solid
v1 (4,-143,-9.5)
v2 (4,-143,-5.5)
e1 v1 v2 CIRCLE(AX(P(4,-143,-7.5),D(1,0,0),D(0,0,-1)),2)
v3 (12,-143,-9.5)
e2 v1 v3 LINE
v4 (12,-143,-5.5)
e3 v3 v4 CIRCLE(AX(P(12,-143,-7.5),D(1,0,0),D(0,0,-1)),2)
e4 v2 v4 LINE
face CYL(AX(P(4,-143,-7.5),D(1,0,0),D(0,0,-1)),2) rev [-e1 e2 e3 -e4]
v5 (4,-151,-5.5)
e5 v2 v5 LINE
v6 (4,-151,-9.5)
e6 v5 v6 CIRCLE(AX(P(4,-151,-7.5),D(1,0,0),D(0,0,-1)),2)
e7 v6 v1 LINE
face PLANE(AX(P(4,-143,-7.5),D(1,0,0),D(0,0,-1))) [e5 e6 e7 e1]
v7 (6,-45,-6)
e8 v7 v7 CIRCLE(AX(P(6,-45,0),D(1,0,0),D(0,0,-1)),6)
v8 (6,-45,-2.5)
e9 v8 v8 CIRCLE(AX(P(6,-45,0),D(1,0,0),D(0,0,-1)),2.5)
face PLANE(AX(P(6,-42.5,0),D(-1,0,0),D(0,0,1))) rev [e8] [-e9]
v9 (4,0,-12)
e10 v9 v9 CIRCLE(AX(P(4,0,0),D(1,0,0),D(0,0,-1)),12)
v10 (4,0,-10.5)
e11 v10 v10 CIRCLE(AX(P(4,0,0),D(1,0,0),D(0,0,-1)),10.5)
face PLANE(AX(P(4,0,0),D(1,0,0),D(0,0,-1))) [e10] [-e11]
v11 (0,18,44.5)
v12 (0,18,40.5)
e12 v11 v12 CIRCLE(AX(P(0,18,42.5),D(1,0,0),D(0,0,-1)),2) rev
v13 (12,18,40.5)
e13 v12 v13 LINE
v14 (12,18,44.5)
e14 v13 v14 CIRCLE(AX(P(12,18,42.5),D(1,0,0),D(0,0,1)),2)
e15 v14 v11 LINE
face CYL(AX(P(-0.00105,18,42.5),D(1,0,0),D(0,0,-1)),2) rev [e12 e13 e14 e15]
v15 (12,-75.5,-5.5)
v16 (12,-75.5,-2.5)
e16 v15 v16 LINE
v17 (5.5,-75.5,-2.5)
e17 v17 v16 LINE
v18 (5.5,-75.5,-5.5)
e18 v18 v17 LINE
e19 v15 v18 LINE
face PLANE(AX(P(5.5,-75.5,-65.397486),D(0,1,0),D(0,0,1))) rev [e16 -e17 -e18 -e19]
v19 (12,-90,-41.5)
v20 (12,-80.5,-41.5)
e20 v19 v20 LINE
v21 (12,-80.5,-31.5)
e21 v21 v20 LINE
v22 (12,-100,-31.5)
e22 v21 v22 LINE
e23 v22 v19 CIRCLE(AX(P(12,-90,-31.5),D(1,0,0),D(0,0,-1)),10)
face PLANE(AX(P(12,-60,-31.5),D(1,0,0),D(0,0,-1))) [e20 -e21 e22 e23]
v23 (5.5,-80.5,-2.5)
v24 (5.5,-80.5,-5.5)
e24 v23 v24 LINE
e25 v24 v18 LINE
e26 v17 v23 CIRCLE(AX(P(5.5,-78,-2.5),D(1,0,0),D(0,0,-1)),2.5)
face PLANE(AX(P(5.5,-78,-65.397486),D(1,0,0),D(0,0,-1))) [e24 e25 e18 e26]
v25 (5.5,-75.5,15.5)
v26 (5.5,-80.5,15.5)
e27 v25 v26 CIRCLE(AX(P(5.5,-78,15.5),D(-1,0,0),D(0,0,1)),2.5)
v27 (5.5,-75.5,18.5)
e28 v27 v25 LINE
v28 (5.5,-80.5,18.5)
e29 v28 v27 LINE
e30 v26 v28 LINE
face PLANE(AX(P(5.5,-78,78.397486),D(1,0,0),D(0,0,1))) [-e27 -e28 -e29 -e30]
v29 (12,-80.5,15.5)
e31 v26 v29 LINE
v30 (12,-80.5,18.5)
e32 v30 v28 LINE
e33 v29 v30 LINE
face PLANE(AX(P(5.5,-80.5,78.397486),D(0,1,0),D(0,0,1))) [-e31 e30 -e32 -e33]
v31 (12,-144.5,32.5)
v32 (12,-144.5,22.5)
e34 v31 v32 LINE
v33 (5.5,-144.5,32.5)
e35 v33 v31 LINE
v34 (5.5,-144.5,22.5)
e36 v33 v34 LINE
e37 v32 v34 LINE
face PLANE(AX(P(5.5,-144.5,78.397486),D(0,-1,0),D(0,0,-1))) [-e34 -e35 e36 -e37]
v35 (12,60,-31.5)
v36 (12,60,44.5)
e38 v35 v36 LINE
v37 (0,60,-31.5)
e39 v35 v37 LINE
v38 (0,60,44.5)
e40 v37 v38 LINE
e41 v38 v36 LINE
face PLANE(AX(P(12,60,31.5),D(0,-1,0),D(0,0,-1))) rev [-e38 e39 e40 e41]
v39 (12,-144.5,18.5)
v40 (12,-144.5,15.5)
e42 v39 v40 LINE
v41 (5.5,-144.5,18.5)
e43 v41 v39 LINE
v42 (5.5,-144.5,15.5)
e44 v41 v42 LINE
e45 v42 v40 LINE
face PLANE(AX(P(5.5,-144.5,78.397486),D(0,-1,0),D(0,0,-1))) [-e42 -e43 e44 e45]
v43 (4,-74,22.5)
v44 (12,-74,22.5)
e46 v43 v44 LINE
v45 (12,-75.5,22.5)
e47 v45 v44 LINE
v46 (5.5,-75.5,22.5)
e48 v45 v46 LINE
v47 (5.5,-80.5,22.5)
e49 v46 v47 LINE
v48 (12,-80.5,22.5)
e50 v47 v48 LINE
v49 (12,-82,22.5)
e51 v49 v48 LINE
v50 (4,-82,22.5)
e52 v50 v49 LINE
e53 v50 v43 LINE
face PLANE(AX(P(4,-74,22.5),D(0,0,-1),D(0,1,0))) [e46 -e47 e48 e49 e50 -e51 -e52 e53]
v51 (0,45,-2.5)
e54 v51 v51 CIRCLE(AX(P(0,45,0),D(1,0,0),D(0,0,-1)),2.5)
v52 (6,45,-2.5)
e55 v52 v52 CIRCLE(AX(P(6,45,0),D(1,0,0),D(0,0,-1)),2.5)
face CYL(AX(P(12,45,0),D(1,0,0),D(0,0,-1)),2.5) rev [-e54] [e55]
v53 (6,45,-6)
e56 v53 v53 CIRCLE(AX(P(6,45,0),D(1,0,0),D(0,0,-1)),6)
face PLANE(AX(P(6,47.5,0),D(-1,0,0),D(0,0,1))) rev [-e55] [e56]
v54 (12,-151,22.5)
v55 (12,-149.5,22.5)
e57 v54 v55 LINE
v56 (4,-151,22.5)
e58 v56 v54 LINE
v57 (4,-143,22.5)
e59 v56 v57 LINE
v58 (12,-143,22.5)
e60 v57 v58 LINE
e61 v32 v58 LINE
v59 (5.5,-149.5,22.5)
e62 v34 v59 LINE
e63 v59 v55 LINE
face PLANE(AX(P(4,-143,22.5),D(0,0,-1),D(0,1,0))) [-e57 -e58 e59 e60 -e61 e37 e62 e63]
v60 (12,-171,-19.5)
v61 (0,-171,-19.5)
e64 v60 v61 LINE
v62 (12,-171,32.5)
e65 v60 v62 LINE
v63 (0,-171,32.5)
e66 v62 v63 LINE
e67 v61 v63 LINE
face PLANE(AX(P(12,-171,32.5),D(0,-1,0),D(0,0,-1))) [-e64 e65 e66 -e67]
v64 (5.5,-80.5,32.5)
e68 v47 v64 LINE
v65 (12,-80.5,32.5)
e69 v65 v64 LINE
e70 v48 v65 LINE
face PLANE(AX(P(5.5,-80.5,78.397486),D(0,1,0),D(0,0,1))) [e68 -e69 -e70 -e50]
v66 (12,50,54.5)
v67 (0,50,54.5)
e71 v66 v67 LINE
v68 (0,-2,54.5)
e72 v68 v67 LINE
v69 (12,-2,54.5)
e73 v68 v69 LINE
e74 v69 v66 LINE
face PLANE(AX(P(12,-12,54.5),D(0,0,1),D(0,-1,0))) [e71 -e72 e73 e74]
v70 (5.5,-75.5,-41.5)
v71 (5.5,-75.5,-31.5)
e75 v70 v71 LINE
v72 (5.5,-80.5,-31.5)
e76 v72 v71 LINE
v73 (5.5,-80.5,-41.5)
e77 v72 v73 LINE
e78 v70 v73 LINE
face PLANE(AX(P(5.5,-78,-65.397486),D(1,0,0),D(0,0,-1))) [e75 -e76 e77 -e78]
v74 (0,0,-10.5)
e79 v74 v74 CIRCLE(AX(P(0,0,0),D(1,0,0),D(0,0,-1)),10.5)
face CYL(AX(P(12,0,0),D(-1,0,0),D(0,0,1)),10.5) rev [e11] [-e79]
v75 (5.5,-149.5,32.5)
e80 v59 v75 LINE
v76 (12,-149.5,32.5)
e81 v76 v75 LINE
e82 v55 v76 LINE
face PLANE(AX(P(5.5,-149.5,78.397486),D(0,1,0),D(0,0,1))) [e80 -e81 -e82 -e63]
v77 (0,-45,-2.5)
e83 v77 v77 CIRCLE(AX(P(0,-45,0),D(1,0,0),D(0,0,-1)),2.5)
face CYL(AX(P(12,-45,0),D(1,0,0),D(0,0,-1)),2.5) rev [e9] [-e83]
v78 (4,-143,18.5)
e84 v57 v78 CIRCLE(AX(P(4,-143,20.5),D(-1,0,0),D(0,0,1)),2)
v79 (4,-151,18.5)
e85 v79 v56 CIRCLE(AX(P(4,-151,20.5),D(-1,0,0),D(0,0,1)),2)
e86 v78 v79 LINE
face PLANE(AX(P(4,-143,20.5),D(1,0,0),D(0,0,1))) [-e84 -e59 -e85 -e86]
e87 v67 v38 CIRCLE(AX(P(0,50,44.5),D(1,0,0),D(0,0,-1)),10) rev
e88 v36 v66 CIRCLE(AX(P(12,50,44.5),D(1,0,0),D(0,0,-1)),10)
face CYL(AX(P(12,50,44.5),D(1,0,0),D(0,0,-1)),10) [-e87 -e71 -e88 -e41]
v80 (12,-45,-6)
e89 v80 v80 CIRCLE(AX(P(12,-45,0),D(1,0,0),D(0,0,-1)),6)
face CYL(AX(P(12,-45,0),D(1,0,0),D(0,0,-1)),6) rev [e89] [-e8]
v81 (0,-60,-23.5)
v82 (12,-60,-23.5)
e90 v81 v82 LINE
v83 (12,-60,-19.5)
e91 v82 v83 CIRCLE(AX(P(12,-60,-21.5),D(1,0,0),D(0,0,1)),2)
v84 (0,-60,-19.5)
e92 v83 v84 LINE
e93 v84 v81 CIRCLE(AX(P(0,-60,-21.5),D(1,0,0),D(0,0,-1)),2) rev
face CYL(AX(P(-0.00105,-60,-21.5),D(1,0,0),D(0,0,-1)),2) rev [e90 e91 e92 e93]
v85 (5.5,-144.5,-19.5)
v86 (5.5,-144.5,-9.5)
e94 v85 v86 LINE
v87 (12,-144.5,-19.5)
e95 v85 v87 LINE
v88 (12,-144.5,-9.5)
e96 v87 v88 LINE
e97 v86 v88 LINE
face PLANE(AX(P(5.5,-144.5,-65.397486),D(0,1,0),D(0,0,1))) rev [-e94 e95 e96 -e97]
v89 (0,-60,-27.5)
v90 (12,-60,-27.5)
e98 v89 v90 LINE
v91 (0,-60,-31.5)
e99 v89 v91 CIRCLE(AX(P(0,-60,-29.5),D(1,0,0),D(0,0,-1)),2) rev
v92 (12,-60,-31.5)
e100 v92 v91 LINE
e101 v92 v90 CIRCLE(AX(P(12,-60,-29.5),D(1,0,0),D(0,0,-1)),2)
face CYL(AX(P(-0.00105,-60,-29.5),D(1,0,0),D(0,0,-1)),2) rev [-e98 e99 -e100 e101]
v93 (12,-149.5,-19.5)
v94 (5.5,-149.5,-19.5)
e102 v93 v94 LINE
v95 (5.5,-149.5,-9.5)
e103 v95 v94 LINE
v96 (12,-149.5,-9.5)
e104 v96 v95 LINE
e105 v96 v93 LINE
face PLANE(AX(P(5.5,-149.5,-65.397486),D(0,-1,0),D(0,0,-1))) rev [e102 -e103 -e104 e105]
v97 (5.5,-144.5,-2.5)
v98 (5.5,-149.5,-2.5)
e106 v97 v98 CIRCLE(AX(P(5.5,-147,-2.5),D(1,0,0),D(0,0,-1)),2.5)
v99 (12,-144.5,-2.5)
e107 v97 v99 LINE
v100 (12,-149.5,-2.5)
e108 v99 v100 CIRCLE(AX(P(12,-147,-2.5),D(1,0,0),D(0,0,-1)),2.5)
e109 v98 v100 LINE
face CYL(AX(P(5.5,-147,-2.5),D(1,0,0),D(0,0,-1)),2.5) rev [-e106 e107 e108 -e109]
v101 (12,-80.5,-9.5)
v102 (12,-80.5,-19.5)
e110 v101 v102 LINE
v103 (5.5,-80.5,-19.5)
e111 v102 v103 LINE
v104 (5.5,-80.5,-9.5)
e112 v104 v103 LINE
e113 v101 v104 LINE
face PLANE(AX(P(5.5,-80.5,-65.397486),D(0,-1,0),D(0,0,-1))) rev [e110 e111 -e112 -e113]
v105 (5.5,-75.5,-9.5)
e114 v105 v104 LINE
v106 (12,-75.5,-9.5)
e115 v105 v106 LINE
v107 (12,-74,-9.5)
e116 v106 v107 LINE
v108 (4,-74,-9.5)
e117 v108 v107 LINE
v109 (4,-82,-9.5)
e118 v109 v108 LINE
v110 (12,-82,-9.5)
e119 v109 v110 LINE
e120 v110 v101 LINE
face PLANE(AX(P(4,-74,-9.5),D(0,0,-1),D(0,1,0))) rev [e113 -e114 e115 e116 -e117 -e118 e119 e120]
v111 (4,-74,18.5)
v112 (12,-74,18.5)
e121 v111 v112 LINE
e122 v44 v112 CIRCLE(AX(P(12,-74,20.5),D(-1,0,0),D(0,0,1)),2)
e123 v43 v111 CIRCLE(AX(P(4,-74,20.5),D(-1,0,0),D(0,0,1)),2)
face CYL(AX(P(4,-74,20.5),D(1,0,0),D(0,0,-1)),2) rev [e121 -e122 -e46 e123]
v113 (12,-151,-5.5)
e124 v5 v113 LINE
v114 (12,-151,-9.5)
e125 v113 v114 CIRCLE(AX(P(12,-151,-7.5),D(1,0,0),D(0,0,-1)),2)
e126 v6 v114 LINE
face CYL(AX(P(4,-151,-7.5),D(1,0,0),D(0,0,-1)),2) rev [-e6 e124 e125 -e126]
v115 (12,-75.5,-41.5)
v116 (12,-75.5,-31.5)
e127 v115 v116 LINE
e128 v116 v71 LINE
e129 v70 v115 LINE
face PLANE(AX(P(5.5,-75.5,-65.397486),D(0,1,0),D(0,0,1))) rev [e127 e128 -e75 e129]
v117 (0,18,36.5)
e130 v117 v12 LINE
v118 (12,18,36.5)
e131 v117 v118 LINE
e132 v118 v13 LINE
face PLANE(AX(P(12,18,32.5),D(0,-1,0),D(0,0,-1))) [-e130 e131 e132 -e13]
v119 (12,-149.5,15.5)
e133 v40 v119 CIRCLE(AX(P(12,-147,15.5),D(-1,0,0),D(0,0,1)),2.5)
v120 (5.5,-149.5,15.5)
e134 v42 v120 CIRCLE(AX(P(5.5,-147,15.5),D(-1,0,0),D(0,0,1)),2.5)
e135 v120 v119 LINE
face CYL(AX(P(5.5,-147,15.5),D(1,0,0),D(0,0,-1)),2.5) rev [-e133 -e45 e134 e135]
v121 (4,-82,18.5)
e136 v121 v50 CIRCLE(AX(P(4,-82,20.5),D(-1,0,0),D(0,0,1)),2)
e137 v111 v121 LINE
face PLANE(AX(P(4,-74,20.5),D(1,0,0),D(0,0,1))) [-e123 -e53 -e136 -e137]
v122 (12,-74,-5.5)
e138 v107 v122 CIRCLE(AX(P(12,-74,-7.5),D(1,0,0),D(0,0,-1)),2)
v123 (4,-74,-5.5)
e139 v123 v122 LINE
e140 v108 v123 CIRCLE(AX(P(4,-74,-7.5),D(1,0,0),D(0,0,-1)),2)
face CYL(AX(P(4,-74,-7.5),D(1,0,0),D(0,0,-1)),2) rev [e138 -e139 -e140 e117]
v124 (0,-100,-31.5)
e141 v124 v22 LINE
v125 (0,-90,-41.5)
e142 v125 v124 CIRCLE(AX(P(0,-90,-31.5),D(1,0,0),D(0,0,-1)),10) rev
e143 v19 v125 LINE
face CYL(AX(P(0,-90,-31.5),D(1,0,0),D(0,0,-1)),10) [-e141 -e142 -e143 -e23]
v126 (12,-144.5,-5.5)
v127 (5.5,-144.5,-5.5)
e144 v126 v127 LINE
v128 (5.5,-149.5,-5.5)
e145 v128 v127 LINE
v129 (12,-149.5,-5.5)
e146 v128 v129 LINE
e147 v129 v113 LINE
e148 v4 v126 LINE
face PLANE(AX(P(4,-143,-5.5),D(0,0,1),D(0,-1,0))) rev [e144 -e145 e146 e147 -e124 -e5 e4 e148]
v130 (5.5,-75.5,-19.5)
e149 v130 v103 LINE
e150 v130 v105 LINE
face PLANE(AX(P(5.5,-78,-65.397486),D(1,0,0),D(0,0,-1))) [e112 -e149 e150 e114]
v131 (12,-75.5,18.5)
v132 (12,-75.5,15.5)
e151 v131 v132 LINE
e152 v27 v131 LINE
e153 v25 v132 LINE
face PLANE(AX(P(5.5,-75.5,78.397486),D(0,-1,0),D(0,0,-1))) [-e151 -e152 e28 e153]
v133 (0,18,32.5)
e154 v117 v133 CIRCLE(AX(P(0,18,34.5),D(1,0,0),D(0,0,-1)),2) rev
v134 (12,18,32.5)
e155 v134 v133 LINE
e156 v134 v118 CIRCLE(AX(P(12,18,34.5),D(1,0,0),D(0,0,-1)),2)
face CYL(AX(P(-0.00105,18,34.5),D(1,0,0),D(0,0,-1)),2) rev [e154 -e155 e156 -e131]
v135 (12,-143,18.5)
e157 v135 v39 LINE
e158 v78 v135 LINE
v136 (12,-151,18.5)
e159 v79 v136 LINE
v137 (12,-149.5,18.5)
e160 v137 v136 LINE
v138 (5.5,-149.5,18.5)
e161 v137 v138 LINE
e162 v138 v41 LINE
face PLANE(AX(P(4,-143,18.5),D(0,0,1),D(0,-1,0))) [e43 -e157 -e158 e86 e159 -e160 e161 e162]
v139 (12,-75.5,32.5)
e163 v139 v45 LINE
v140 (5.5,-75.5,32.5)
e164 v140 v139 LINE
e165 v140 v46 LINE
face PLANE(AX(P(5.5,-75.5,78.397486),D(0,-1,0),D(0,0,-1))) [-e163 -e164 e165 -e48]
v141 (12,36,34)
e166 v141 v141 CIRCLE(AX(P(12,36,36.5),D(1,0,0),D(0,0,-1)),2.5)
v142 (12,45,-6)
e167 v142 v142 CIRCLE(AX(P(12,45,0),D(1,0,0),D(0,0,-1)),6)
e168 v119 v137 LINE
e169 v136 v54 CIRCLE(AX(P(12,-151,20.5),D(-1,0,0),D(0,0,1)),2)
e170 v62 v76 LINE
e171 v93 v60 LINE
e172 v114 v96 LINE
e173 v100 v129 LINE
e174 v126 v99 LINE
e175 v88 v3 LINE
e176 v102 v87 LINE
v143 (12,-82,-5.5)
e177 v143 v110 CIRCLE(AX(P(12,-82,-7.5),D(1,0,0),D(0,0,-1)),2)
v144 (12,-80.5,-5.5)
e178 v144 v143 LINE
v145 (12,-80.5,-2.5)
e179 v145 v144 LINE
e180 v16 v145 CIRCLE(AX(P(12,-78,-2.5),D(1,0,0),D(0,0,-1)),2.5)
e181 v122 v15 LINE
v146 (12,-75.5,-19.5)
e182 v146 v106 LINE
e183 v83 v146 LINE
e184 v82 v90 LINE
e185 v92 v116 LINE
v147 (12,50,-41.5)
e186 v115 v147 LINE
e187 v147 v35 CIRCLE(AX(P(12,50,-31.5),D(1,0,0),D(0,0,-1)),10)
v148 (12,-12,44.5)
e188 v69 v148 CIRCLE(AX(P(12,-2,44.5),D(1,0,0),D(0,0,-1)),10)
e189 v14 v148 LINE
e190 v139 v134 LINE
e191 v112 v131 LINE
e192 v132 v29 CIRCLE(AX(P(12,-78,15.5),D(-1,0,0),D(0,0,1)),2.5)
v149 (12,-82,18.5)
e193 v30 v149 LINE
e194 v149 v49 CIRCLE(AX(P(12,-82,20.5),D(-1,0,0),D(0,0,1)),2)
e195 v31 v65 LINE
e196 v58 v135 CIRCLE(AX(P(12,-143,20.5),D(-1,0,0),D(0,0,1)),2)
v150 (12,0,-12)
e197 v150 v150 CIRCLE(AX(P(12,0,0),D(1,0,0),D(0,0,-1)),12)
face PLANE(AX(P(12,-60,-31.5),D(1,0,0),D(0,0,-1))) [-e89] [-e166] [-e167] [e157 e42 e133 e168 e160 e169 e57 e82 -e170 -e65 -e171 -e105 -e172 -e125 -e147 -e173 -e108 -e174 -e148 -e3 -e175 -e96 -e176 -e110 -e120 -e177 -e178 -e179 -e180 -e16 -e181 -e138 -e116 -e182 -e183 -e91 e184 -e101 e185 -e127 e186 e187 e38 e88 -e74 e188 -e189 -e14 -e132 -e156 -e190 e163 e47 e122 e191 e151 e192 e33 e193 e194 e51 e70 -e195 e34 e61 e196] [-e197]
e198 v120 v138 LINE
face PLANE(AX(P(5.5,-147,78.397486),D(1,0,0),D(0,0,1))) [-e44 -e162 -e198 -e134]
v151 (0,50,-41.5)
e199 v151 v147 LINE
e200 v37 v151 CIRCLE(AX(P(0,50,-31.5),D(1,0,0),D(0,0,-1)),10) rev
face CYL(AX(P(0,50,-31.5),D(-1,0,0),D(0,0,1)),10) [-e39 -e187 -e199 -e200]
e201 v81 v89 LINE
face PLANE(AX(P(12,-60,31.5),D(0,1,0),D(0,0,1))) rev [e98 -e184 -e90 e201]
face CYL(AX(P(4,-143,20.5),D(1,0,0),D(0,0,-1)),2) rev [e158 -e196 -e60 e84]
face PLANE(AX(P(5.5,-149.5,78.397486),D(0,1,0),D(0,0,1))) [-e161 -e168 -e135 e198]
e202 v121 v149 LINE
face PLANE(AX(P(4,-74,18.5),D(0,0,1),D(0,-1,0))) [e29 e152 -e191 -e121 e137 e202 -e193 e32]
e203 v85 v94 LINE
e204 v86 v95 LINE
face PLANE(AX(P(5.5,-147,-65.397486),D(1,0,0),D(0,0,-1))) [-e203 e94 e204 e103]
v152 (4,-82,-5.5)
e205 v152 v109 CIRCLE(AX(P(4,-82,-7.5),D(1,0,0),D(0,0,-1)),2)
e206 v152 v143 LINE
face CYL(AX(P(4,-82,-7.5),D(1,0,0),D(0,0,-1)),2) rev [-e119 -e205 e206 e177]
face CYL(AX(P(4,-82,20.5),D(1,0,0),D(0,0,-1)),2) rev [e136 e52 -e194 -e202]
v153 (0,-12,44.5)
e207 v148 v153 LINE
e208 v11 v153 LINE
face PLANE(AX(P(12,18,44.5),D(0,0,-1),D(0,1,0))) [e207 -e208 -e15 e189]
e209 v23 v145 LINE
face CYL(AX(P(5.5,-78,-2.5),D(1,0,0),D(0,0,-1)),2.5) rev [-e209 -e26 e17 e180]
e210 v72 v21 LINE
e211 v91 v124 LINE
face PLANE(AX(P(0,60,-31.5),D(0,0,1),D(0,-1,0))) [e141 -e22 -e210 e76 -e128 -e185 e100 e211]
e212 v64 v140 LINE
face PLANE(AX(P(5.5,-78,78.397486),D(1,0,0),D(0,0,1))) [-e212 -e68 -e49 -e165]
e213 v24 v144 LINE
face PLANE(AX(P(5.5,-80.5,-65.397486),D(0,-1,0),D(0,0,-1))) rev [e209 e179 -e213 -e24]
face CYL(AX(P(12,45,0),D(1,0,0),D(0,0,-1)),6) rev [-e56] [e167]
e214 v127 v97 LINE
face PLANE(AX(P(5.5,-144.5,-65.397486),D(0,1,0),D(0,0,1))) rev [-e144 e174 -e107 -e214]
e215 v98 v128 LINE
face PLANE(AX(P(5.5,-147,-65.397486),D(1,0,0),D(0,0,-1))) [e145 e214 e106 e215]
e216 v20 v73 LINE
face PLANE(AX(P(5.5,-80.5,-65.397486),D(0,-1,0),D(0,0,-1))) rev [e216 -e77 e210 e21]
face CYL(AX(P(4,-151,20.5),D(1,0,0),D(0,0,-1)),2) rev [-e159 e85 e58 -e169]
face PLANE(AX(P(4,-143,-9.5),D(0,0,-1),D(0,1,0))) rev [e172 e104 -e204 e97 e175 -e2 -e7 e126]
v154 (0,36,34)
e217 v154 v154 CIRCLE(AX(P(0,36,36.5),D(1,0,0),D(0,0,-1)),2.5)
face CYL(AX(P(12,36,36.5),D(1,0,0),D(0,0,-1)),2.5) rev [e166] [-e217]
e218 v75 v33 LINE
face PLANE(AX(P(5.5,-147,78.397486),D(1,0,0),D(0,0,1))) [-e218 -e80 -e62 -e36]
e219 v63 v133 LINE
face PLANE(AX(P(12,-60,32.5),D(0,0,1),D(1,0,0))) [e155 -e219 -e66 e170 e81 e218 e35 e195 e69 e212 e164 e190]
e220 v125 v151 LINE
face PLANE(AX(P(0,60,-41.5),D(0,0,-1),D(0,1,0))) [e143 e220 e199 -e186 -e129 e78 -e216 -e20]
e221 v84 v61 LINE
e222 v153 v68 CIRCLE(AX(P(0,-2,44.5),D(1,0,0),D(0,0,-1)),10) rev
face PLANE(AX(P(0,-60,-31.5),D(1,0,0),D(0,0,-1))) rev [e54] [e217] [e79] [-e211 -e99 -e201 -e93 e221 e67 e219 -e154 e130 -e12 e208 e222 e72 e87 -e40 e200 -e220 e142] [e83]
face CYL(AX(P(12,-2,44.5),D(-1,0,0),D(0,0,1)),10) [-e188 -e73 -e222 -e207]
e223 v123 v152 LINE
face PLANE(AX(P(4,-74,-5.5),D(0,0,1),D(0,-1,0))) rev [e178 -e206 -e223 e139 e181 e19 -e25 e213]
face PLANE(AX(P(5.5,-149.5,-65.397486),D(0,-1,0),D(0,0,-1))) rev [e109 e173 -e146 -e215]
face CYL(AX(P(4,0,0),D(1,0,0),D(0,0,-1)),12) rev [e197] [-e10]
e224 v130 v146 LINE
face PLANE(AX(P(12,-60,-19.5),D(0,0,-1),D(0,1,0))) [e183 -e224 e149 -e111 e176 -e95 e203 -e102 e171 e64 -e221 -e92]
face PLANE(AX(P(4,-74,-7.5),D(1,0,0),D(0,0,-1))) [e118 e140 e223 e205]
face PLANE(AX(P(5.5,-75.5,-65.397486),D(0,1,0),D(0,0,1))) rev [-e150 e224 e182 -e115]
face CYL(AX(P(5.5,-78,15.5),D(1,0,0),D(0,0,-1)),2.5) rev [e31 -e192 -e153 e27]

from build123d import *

# Parameters (mm, degrees)
SKETCH1_W                          = 63
SKETCH1_H                          = 120
SKETCH1_R                          = 10.5
BOSS_EXTRUDE1_DEPTH                = 12
BOSS_EXTRUDE2_DEPTH                = 12
SKETCH9_W                          = 52
SKETCH9_H                          = 111
BOSS_EXTRUDE3_DEPTH                = 12
SKETCH11_W                         = 10
SKETCH11_H                         = 160
BOSS_EXTRUDE4_DEPTH                = 12
F_5_0_5_DIAMETER_HOLE1_D           = 5
LINEAR_RAIL_MOUNT_HOLE_D           = 5
LINEAR_RAIL_MOUNT_HOLE_CBORE_D     = 12
LINEAR_RAIL_MOUNT_HOLE_CBORE_DEPTH = 6
SKETCH27_R                         = 12
CUT_EXTRUDE1_DEPTH                 = 8
CUT_EXTRUDE2_REACH                 = 181.876
FILLET1_R                          = 10
CUT_EXTRUDE3_DEPTH                 = 8
CUT_EXTRUDE4_DEPTH                 = 6.5
LPATTERN1_COUNT                    = 2
LPATTERN1_PITCH                    = 69
MIRROR1_COPY_1_DEPTH               = 8
MIRROR1_COPY_2_DEPTH               = 6.5


with BuildPart() as part:
    # Sketch1 → Boss-Extrude1 (new body)
    with BuildSketch(Plane(origin=(0, 0, 0), x_dir=(0, 0, -1), z_dir=(1, 0, 0))):
        Rectangle(SKETCH1_W, SKETCH1_H)
        Circle(SKETCH1_R, mode=Mode.SUBTRACT)
    extrude(amount=BOSS_EXTRUDE1_DEPTH)

    # Sketch8 → Boss-Extrude2 (add)
    with BuildSketch(Plane.ZY):
        Polygon((44.5, 18), (44.5, -12), (54.5, -12), (54.5, 60), (31.5, 60), (31.5, -60), (32.5, -60), (32.5, 18), align=None)
    extrude(amount=-BOSS_EXTRUDE2_DEPTH)

    # Sketch9 → Boss-Extrude3 (add)
    with BuildSketch(Plane.ZY):
        with Locations((6.5, -115.5)):
            Rectangle(SKETCH9_W, SKETCH9_H)
    extrude(amount=-BOSS_EXTRUDE3_DEPTH)

    # Sketch11 → Boss-Extrude4 (add)
    with BuildSketch(Plane(origin=(12, 0, 0), x_dir=(0, 0, -1), z_dir=(1, 0, 0))):
        with Locations((36.5, -20)):
            Rectangle(SKETCH11_W, SKETCH11_H)
    extrude(amount=-BOSS_EXTRUDE4_DEPTH)

    # Ø5.0 (5) Diameter Hole1 (through all)
    with Locations(Plane(origin=(12, 0, 0), x_dir=(0, 0, -1), z_dir=(1, 0, 0))):
        with Locations((-36.5, 36)):
            Hole(F_5_0_5_DIAMETER_HOLE1_D / 2)

    # Linear Rail Mount Hole (through all)
    with Locations(Plane(origin=(12, 0, 0), x_dir=(0, 0, -1), z_dir=(1, 0, 0))):
        with Locations((0, -45), (0, 45)):
            CounterBoreHole(LINEAR_RAIL_MOUNT_HOLE_D / 2, LINEAR_RAIL_MOUNT_HOLE_CBORE_D / 2, LINEAR_RAIL_MOUNT_HOLE_CBORE_DEPTH)

    # Sketch27 → Cut-Extrude1 (cut)
    with BuildSketch(Plane(origin=(12, 0, 0), x_dir=(0, 0, -1), z_dir=(1, 0, 0))):
        Circle(SKETCH27_R)
    extrude(amount=-CUT_EXTRUDE1_DEPTH, mode=Mode.SUBTRACT)

    # Sketch28 → Cut-Extrude2 (cut, up to next)
    with BuildSketch(Plane(origin=(12, 0, 0), x_dir=(0, 0, -1), z_dir=(1, 0, 0)), mode=Mode.PRIVATE) as cut_extrude2_sk1:
        with BuildLine():
            Line((-44.5, 18), (-40.5, 18))
            ThreePointArc((-40.5, 18), (-42.5, 20), (-44.5, 18))
        make_face()
    cut_extrude2_tool1 = extrude(cut_extrude2_sk1.sketch, amount=-CUT_EXTRUDE2_REACH, mode=Mode.PRIVATE) & part.part
    # Sketch28 → Cut-Extrude2 (cut, up to next)
    with BuildSketch(Plane(origin=(12, 0, 0), x_dir=(0, 0, -1), z_dir=(1, 0, 0)), mode=Mode.PRIVATE) as cut_extrude2_sk2:
        with BuildLine():
            Line((-36.5, 18), (-32.5, 18))
            ThreePointArc((-32.5, 18), (-34.5, 20), (-36.5, 18))
        make_face()
    cut_extrude2_tool2 = extrude(cut_extrude2_sk2.sketch, amount=-CUT_EXTRUDE2_REACH, mode=Mode.PRIVATE) & part.part
    # Sketch28 → Cut-Extrude2 (cut, up to next)
    with BuildSketch(Plane(origin=(12, 0, 0), x_dir=(0, 0, -1), z_dir=(1, 0, 0)), mode=Mode.PRIVATE) as cut_extrude2_sk3:
        with BuildLine():
            Line((19.5, -60), (23.5, -60))
            ThreePointArc((23.5, -60), (21.5, -58), (19.5, -60))
        make_face()
    cut_extrude2_tool3 = extrude(cut_extrude2_sk3.sketch, amount=-CUT_EXTRUDE2_REACH, mode=Mode.PRIVATE) & part.part
    # Sketch28 → Cut-Extrude2 (cut, up to next)
    with BuildSketch(Plane(origin=(12, 0, 0), x_dir=(0, 0, -1), z_dir=(1, 0, 0)), mode=Mode.PRIVATE) as cut_extrude2_sk4:
        with BuildLine():
            Line((27.5, -60), (31.5, -60))
            ThreePointArc((31.5, -60), (29.5, -58), (27.5, -60))
        make_face()
    cut_extrude2_tool4 = extrude(cut_extrude2_sk4.sketch, amount=-CUT_EXTRUDE2_REACH, mode=Mode.PRIVATE) & part.part
    add(cut_extrude2_tool1.solids().sort_by_distance((12, 18.848826, 42.5))[0], mode=Mode.SUBTRACT)
    add(cut_extrude2_tool2.solids().sort_by_distance((12, 18.848826, 34.5))[0], mode=Mode.SUBTRACT)
    add(cut_extrude2_tool3.solids().sort_by_distance((12, -59.151174, -21.5))[0], mode=Mode.SUBTRACT)
    add(cut_extrude2_tool4.solids().sort_by_distance((12, -59.151174, -29.5))[0], mode=Mode.SUBTRACT)

    # Fillet1
    fillet1_edges = [part.edges().sort_by_distance(p)[0] for p in [
        (6, -12, 54.5),
        (6, -100, -41.5),
        (6, 60, 54.5),
        (6, 60, -41.5),
    ]]
    fillet(fillet1_edges, radius=FILLET1_R - 0.0001)  # a hair under: the kernel refuses the full size

    # Sketch29 → Cut-Extrude3 (cut)
    with BuildSketch(Plane(origin=(12, 0, 0), x_dir=(0, 0, -1), z_dir=(1, 0, 0))):
        with BuildLine():
            Line((9.5, -143), (9.5, -151))
            ThreePointArc((9.5, -151), (7.5, -153), (5.5, -151))
            Line((5.5, -151), (5.5, -143))
            ThreePointArc((5.5, -143), (7.5, -141), (9.5, -143))
        make_face()
    cut_extrude3 = extrude(amount=-CUT_EXTRUDE3_DEPTH, mode=Mode.SUBTRACT)

    # Sketch31 → Cut-Extrude4 (cut)
    with BuildSketch(Plane(origin=(12, 0, 0), x_dir=(0, 0, -1), z_dir=(1, 0, 0))):
        with BuildLine():
            Line((65.397486198, -149.5), (2.5, -149.5))
            ThreePointArc((2.5, -149.5), (0, -147), (2.5, -144.5))
            Line((2.5, -144.5), (65.397486198, -144.5))
            ThreePointArc((65.397486198, -144.5), (67.897486198, -147), (65.397486198, -149.5))
        make_face()
    cut_extrude4 = extrude(amount=-CUT_EXTRUDE4_DEPTH, mode=Mode.SUBTRACT)

    # LPattern1: Cut-Extrude3, Cut-Extrude4 ×2
    with Locations(*[(0, i * LPATTERN1_PITCH, 0) for i in range(1, LPATTERN1_COUNT)]):
        add(cut_extrude3, mode=Mode.SUBTRACT)
        add(cut_extrude4, mode=Mode.SUBTRACT)

    # Mirror1: Cut-Extrude3, Cut-Extrude4 across plane
    add(cut_extrude3.mirror(Plane(origin=(0, 0, 6.5), x_dir=(1, 0, 0), z_dir=(0, 0, -1))), mode=Mode.SUBTRACT)
    add(cut_extrude4.mirror(Plane(origin=(0, 0, 6.5), x_dir=(1, 0, 0), z_dir=(0, 0, -1))), mode=Mode.SUBTRACT)

    # Mirror1 copy 1 sketch → Mirror1 copy 1 (cut)
    with BuildSketch(Plane(origin=(12, 69, 13), x_dir=(0, 0, 1), z_dir=(1, 0, 0))):
        with BuildLine():
            Line((9.5, 143), (9.5, 151))
            ThreePointArc((9.5, 151), (7.5, 153), (5.5, 151))
            Line((5.5, 151), (5.5, 143))
            ThreePointArc((5.5, 143), (7.5, 141), (9.5, 143))
        make_face()
    extrude(amount=-MIRROR1_COPY_1_DEPTH, mode=Mode.SUBTRACT)

    # Mirror1 copy 2 sketch → Mirror1 copy 2 (cut)
    with BuildSketch(Plane(origin=(12, 69, 13), x_dir=(0, 0, 1), z_dir=(1, 0, 0))):
        with BuildLine():
            Line((65.397486198, 149.5), (2.5, 149.5))
            ThreePointArc((2.5, 149.5), (0, 147), (2.5, 144.5))
            Line((2.5, 144.5), (65.397486198, 144.5))
            ThreePointArc((65.397486198, 144.5), (67.897486198, 147), (65.397486198, 149.5))
        make_face()
    extrude(amount=-MIRROR1_COPY_2_DEPTH, mode=Mode.SUBTRACT)


solid = part.part
